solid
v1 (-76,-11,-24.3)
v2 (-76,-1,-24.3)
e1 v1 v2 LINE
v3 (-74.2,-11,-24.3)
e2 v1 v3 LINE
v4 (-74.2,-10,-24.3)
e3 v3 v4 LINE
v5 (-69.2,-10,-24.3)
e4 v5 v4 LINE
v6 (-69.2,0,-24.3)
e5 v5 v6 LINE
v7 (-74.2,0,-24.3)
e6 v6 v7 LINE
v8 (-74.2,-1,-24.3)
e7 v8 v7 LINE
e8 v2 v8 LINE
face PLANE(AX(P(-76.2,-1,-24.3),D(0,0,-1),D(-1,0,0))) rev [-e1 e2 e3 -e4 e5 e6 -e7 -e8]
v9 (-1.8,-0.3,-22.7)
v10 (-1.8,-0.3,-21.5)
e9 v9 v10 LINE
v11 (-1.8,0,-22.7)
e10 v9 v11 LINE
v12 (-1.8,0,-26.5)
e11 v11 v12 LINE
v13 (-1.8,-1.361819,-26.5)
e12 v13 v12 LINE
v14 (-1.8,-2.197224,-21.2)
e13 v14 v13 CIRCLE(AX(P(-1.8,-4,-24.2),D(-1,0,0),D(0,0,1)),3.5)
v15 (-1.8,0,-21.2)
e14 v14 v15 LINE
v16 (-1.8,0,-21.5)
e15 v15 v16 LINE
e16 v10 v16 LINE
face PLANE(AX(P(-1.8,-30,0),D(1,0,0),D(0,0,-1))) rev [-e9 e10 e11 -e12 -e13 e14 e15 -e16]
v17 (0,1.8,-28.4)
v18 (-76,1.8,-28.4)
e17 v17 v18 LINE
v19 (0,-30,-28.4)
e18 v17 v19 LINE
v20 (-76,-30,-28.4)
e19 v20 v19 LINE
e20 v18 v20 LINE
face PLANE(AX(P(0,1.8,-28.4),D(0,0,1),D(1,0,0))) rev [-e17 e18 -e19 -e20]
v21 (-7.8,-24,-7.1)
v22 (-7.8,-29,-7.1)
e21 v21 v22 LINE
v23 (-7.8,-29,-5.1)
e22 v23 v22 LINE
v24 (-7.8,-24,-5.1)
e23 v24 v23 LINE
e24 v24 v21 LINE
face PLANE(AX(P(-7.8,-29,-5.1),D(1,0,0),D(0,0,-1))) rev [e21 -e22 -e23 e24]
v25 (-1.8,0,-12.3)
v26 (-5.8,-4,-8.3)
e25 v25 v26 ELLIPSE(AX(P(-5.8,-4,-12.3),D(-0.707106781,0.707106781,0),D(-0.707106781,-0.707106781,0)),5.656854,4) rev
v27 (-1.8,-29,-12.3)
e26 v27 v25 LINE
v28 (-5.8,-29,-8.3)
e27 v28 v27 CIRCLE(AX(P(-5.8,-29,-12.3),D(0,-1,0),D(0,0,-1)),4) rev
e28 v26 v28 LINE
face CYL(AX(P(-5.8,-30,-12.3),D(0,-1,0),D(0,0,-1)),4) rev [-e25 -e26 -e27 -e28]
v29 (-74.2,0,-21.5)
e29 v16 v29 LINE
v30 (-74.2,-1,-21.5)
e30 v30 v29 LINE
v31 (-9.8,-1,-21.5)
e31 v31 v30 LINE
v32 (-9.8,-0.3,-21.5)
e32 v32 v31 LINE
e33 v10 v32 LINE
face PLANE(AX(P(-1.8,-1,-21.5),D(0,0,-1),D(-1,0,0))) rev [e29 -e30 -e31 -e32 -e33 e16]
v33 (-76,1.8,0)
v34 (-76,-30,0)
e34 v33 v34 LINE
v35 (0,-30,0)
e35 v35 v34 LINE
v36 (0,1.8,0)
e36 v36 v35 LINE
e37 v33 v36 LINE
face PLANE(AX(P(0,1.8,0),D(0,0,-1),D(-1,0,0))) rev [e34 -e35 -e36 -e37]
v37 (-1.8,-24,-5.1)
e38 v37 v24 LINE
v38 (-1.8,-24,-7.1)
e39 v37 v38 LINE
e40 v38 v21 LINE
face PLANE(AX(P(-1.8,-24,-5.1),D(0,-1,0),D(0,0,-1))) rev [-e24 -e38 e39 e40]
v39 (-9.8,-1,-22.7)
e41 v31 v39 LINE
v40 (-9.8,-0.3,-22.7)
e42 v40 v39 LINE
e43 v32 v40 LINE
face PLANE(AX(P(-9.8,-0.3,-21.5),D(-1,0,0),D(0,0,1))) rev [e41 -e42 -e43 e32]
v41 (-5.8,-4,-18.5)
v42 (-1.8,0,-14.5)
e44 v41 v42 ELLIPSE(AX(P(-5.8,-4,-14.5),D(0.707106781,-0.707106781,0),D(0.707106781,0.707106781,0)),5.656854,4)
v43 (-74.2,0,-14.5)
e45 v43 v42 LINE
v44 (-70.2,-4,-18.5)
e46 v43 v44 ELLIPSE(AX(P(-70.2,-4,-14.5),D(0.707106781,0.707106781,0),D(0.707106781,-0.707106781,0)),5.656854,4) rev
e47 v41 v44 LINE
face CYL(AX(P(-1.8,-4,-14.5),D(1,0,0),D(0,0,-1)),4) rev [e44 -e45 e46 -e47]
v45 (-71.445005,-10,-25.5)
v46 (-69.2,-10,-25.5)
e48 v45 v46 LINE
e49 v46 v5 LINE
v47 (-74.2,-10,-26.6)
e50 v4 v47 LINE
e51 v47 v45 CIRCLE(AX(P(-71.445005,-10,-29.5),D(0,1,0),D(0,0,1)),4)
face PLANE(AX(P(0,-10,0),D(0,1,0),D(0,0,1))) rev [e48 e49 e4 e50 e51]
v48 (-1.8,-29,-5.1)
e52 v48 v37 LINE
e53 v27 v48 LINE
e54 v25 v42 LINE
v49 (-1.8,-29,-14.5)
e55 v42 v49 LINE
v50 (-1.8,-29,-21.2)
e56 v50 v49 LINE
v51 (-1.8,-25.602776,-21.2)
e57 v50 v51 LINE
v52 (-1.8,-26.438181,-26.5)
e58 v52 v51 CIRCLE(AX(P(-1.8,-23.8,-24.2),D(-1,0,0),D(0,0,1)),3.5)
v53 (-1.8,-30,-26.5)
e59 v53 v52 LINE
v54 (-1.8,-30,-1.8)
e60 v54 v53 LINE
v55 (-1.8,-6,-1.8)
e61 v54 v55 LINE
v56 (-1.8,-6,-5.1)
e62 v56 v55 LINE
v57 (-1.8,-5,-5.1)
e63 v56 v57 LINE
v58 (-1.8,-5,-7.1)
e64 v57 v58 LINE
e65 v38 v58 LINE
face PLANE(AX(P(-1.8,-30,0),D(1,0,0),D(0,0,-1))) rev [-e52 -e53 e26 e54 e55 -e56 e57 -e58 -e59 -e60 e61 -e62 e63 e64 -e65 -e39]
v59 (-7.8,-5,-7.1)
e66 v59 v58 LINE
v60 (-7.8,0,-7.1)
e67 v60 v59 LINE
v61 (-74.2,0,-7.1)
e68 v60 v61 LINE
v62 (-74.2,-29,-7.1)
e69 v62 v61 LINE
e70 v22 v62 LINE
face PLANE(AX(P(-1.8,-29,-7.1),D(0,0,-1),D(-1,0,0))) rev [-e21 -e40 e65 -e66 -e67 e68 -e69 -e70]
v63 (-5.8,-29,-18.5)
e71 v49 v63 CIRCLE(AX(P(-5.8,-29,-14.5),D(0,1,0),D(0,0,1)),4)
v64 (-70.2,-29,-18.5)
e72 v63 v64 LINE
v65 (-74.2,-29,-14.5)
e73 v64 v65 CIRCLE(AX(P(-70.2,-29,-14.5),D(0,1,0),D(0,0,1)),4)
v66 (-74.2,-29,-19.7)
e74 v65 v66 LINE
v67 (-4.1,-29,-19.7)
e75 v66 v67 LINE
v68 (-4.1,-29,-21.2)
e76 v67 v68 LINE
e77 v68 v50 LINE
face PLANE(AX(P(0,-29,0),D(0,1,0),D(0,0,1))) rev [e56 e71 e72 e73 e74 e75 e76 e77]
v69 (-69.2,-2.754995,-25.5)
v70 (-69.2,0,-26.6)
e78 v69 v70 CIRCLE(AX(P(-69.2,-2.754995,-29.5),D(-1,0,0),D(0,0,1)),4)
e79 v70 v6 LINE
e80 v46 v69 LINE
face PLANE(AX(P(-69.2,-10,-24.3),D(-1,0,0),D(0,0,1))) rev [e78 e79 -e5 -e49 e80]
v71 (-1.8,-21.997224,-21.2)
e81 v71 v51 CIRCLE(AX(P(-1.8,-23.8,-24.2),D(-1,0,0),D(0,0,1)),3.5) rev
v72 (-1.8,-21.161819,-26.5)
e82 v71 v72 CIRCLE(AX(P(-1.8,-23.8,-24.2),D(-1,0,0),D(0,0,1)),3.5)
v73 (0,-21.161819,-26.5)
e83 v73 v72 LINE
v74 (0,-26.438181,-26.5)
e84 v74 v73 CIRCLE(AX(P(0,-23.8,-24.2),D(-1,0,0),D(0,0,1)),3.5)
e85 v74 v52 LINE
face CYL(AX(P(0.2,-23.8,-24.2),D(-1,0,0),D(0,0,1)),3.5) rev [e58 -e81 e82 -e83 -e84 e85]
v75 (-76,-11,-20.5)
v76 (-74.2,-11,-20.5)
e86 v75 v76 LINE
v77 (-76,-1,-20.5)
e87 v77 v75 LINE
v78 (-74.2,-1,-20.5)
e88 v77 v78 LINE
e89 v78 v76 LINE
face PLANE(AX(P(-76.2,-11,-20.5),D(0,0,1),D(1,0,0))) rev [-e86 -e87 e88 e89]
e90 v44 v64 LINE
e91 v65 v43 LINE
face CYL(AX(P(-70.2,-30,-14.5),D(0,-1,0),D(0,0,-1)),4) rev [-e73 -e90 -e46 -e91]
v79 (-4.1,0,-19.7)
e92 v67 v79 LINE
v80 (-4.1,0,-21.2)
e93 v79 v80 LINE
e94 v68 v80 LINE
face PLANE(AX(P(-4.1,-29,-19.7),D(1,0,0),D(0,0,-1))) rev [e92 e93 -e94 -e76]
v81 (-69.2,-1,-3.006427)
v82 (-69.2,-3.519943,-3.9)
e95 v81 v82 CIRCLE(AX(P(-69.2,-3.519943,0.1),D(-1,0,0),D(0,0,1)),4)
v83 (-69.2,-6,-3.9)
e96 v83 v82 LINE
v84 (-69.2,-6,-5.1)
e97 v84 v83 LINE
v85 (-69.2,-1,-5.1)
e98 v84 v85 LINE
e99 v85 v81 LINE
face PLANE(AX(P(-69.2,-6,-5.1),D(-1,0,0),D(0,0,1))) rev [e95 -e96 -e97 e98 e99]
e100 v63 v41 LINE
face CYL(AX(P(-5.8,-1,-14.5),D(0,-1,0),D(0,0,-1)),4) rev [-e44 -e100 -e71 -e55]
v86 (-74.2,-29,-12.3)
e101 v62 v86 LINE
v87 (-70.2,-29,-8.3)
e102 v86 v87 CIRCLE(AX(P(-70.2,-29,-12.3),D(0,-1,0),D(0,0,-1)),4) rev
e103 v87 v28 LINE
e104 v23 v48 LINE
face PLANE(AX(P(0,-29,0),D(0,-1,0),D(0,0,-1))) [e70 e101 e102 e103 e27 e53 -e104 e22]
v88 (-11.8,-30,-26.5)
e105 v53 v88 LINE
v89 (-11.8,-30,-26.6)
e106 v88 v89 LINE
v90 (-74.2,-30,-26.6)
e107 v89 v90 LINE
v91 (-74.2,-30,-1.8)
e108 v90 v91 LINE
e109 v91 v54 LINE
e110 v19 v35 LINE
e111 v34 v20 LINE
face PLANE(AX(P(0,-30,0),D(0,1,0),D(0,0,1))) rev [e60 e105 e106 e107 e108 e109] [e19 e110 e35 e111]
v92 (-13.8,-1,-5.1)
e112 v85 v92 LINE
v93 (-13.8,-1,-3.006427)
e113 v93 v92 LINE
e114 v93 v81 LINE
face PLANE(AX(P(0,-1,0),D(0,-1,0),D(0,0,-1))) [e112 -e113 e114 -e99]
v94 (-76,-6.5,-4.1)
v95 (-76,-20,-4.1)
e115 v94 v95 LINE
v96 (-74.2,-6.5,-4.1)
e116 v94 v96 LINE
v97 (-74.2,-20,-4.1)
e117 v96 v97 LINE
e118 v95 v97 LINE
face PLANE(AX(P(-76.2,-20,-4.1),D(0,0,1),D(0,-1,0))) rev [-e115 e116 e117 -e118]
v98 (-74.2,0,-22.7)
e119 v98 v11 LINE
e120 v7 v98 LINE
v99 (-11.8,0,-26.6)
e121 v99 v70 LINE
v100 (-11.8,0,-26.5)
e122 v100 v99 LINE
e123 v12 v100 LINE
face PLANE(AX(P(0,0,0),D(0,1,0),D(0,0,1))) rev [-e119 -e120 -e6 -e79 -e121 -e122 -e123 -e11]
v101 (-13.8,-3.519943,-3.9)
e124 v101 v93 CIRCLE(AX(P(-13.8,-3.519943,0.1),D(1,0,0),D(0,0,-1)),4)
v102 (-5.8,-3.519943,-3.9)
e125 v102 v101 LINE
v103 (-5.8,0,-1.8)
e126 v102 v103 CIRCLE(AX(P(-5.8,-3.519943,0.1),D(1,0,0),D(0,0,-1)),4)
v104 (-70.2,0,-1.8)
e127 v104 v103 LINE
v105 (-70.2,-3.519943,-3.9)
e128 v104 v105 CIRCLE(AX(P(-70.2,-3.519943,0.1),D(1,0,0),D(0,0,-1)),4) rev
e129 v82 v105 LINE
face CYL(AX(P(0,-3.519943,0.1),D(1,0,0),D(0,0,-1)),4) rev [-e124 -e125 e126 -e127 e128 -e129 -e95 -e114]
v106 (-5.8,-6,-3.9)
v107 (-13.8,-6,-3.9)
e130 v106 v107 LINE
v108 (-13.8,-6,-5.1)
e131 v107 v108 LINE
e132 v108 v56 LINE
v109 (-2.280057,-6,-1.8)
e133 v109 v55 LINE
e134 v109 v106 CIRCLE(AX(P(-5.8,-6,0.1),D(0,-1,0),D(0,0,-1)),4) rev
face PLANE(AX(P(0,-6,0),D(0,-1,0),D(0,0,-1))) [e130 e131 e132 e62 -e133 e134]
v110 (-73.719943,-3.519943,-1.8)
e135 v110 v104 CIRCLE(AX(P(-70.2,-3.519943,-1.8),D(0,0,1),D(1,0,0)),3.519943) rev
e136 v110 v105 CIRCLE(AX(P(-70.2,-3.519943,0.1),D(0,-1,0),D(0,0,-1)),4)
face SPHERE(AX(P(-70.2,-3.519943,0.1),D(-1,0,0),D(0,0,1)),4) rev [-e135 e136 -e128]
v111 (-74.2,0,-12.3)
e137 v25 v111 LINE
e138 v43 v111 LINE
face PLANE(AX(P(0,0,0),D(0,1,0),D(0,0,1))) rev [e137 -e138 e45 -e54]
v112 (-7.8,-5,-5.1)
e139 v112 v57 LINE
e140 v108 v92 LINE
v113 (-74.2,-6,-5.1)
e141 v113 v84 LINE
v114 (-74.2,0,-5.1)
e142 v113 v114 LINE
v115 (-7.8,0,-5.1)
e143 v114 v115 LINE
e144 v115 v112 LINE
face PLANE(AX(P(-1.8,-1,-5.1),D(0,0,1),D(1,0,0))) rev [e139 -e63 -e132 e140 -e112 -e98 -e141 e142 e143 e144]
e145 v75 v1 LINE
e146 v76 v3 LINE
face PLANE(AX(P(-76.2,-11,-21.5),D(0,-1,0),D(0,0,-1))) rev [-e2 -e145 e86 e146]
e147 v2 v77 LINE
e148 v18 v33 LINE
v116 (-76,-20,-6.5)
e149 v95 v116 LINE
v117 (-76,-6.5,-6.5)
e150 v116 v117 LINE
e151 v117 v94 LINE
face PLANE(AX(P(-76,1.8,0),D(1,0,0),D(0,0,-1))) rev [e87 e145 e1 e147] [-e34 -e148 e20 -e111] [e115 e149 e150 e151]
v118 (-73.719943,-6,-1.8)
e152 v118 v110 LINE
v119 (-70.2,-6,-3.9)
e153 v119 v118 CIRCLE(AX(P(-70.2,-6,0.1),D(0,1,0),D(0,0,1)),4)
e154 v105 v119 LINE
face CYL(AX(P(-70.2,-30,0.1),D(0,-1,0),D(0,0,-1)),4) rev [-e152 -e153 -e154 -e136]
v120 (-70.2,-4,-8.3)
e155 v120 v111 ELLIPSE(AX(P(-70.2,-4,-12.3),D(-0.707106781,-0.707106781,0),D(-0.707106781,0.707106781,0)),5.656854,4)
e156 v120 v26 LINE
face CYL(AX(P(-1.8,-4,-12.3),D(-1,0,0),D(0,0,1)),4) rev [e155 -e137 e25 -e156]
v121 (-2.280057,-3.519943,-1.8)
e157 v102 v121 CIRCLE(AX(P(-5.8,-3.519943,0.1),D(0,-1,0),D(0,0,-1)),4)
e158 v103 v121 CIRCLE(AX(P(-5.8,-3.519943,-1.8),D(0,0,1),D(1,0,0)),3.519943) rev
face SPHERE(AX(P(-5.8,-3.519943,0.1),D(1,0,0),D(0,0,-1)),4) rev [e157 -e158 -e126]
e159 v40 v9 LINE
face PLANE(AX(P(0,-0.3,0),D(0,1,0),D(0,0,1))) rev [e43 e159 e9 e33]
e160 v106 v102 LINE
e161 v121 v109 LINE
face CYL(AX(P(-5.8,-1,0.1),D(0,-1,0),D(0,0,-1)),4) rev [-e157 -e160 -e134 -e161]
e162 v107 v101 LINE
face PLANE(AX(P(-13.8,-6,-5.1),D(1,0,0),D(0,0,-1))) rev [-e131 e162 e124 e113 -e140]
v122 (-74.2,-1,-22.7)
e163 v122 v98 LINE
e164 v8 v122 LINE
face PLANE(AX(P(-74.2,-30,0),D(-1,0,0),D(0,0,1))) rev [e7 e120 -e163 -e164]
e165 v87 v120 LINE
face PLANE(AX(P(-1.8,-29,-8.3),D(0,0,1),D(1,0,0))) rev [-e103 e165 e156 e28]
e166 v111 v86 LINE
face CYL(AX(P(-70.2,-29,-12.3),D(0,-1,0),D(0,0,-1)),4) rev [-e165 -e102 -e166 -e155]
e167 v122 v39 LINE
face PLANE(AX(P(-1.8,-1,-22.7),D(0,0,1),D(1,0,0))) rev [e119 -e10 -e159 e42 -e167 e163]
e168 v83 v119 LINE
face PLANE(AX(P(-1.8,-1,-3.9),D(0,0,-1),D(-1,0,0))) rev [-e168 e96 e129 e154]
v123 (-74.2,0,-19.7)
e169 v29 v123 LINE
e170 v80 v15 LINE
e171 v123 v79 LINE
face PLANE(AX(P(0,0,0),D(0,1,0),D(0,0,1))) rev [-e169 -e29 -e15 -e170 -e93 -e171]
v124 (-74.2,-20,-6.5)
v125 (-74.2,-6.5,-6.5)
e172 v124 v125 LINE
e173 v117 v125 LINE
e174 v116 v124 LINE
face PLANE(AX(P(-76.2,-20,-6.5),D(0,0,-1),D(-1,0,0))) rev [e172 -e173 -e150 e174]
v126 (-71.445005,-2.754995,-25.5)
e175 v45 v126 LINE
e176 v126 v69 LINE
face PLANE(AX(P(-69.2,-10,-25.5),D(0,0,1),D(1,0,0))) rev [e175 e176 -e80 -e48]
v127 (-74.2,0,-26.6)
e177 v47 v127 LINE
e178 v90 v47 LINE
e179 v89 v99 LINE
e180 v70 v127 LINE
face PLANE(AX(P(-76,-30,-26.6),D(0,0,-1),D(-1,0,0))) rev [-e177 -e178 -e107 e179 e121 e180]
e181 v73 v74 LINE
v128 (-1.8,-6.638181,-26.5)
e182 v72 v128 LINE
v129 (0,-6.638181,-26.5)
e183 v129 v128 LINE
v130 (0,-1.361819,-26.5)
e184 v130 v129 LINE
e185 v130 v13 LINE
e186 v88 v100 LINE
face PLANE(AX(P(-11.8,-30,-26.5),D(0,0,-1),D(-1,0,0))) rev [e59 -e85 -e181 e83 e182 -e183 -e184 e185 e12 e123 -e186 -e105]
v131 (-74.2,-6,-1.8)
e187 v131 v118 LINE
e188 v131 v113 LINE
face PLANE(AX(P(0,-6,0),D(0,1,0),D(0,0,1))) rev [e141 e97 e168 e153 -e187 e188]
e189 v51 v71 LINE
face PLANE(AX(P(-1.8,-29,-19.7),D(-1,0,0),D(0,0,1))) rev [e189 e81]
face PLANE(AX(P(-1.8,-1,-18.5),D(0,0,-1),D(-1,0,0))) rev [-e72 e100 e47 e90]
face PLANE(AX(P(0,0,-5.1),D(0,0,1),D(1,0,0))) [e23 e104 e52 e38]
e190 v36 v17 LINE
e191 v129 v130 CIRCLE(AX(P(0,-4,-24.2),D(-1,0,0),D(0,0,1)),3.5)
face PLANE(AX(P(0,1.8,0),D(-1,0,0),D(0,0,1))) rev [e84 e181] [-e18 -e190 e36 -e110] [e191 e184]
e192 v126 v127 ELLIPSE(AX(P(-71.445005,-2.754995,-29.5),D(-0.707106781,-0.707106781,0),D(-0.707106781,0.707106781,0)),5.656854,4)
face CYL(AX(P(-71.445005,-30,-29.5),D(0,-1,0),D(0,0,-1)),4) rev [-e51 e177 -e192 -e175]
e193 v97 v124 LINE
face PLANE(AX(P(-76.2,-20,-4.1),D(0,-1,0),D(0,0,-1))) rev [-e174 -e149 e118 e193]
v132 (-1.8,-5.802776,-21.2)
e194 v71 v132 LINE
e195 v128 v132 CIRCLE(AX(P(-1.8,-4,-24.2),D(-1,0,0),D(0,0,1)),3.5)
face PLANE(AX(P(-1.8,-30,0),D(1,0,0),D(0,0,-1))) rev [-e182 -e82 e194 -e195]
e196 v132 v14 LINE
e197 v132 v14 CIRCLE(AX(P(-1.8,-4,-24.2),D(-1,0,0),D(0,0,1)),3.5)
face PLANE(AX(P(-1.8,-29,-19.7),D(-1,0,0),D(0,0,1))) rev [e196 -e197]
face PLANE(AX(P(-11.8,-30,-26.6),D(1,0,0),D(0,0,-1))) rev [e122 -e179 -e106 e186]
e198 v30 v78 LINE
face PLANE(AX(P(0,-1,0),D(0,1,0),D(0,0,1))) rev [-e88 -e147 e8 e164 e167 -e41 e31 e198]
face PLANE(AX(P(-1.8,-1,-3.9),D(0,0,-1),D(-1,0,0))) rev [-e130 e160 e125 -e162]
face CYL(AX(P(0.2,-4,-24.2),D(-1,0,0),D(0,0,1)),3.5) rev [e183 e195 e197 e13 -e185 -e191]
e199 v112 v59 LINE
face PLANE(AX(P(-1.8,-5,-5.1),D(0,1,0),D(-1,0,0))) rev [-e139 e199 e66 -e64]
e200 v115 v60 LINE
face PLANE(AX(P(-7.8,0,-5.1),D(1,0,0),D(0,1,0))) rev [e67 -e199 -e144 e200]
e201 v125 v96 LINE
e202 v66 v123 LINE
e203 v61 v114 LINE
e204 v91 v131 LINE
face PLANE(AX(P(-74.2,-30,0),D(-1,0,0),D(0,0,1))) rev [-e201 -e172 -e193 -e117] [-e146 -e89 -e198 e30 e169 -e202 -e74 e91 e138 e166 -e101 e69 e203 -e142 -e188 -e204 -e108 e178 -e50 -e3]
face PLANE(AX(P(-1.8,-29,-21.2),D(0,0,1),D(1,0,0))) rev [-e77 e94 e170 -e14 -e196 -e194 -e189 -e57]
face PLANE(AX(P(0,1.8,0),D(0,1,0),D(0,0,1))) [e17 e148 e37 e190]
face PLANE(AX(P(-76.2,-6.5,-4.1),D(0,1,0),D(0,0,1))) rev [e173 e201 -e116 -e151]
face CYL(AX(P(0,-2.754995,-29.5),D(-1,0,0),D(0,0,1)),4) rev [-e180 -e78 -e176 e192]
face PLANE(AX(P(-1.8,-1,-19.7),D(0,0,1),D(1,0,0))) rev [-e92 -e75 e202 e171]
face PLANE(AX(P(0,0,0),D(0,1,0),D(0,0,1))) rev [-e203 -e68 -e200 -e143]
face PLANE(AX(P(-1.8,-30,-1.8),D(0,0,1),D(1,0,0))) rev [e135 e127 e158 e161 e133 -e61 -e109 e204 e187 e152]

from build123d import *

# Parameters (mm, degrees)
SKETCH1_W            = 76
SKETCH1_H            = 28.4
BOSS_EXTRUDE1_DEPTH  = 1.8
SKETCH2_W            = 76
SKETCH2_H            = 1.8
BOSS_EXTRUDE2_DEPTH  = 30
SKETCH3_W            = 1.8
SKETCH3_H            = 26.6
BOSS_EXTRUDE3_DEPTH  = 30
SKETCH4_W            = 72.4
SKETCH4_H            = 1.2
BOSS_EXTRUDE4_DEPTH  = 1
SKETCH5_W            = 5
SKETCH5_H            = 1.2
BOSS_EXTRUDE5_DEPTH  = 28
SKETCH6_W            = 2.8
SKETCH6_H            = 10
CUT_EXTRUDE1_DEPTH   = 2
SKETCH7_W            = 5
SKETCH7_H            = 1.2
BOSS_EXTRUDE6_DEPTH  = 10
SKETCH8_W            = 8
SKETCH8_H            = 1.2
CUT_EXTRUDE2_DEPTH   = 0.7
SKETCH9_W            = 10
SKETCH9_H            = 0.1
BOSS_EXTRUDE7_DEPTH  = 30
CUT_EXTRUDE3_DEPTH   = 2
SKETCH11_W           = 62.4
SKETCH11_H           = 1.2
BOSS_EXTRUDE8_DEPTH  = 28
SKETCH12_W           = 72.4
SKETCH12_H           = 1.2
BOSS_EXTRUDE9_DEPTH  = 29
SKETCH13_W           = 72.4
SKETCH13_H           = 1.2
BOSS_EXTRUDE10_DEPTH = 1
SKETCH14_W           = 5
SKETCH14_H           = 1.2
SKETCH14_W_2         = 12
BOSS_EXTRUDE11_DEPTH = 5
SKETCH15_W           = 6
SKETCH15_H           = 5
BOSS_EXTRUDE12_DEPTH = 2
SKETCH16_W           = 2.4
SKETCH16_H           = 13.5
CUT_EXTRUDE4_DEPTH   = 2
SKETCH17_W           = 72.4
SKETCH17_H           = 1.8
BOSS_EXTRUDE13_DEPTH = 30
FILLET1_R            = 4
SKETCH19_W           = 2.3
SKETCH19_H           = 1.5
BOSS_EXTRUDE14_DEPTH = 29
FILLET2_R            = 4
FILLET3_R            = 4
FILLET4_R            = 4
SKETCH18_W           = 1
SKETCH18_H           = 10
CUT_EXTRUDE5_DEPTH   = 2


with BuildPart() as part:
    # Sketch1 → Boss-Extrude1 (new body)
    with BuildSketch(Plane(origin=(0, 0, 0), x_dir=(1, 0, 0), z_dir=(0, 1, 0))):
        with Locations((-38, 14.2)):
            Rectangle(SKETCH1_W, SKETCH1_H)
    extrude(amount=BOSS_EXTRUDE1_DEPTH)

    # Sketch2 → Boss-Extrude2 (add)
    with BuildSketch(Plane(origin=(0, 0, 0), x_dir=(-1, 0, 0), z_dir=(0, -1, 0))):
        with Locations((38, 27.5)):
            Rectangle(SKETCH2_W, SKETCH2_H)
    extrude(amount=BOSS_EXTRUDE2_DEPTH)

    # Sketch3 → Boss-Extrude3 (add)
    with BuildSketch(Plane(origin=(0, 0, 0), x_dir=(-1, 0, 0), z_dir=(0, -1, 0))):
        with Locations((75.1, 13.3)):
            Rectangle(SKETCH3_W, SKETCH3_H)
        with Locations((0.9, 13.3)):
            Rectangle(SKETCH3_W, SKETCH3_H)
    extrude(amount=BOSS_EXTRUDE3_DEPTH)

    # Sketch4 → Boss-Extrude4 (add)
    with BuildSketch(Plane(origin=(0, 0, 0), x_dir=(-1, 0, 0), z_dir=(0, -1, 0))):
        with Locations((38, 19.1)):
            Rectangle(SKETCH4_W, SKETCH4_H)
        with Locations((38, 22.1)):
            Rectangle(SKETCH4_W, SKETCH4_H)
    extrude(amount=BOSS_EXTRUDE4_DEPTH)

    # Sketch5 → Boss-Extrude5 (add)
    with BuildSketch(Plane(origin=(0, -1, 0), x_dir=(-1, 0, 0), z_dir=(0, -1, 0))):
        with Locations((4.3, 19.1)):
            Rectangle(SKETCH5_W, SKETCH5_H)
        with Locations((71.7, 19.1)):
            Rectangle(SKETCH5_W, SKETCH5_H)
    extrude(amount=BOSS_EXTRUDE5_DEPTH)

    # Sketch6 → Cut-Extrude1 (cut)
    with BuildSketch(Plane(origin=(-74.2, 0, 0), x_dir=(0, 0, -1), z_dir=(1, 0, 0))):
        with Locations((22.9, -6)):
            Rectangle(SKETCH6_W, SKETCH6_H)
    extrude(amount=-CUT_EXTRUDE1_DEPTH, mode=Mode.SUBTRACT)

    # Sketch7 → Boss-Extrude6 (add)
    with BuildSketch(Plane(origin=(0, 0, 0), x_dir=(-1, 0, 0), z_dir=(0, -1, 0))):
        with Locations((71.7, 24.9)):
            Rectangle(SKETCH7_W, SKETCH7_H)
    extrude(amount=BOSS_EXTRUDE6_DEPTH)

    # Sketch8 → Cut-Extrude2 (cut)
    with BuildSketch(Plane(origin=(0, -1, 0), x_dir=(-1, 0, 0), z_dir=(0, -1, 0))):
        with Locations((5.8, 22.1)):
            Rectangle(SKETCH8_W, SKETCH8_H)
    extrude(amount=-CUT_EXTRUDE2_DEPTH, mode=Mode.SUBTRACT)

    # Sketch9 → Boss-Extrude7 (add)
    with BuildSketch(Plane(origin=(0, 0, 0), x_dir=(-1, 0, 0), z_dir=(0, -1, 0))):
        with Locations((6.8, 26.55)):
            Rectangle(SKETCH9_W, SKETCH9_H)
    extrude(amount=BOSS_EXTRUDE7_DEPTH)

    # Sketch10 → Cut-Extrude3 (cut)
    with BuildSketch(Plane.ZY.offset(1.8)):
        with BuildLine():
            Line((-26.5, -6.638181192), (-26.5, -1.361818808))
            ThreePointArc((-26.5, -1.361818808), (-20.7, -4), (-26.5, -6.638181192))
        make_face()
        with BuildLine():
            Line((-26.5, -21.161818808), (-26.5, -26.438181192))
            ThreePointArc((-26.5, -26.438181192), (-20.7, -23.8), (-26.5, -21.161818808))
        make_face()
    extrude(amount=-CUT_EXTRUDE3_DEPTH, mode=Mode.SUBTRACT)

    # Sketch11 → Boss-Extrude8 (add)
    with BuildSketch(Plane(origin=(0, -1, 0), x_dir=(-1, 0, 0), z_dir=(0, -1, 0))):
        with Locations((38, 19.1)):
            Rectangle(SKETCH11_W, SKETCH11_H)
    extrude(amount=BOSS_EXTRUDE8_DEPTH)

    # Sketch12 → Boss-Extrude9 (add)
    with BuildSketch(Plane.XZ):
        with Locations((-38, -7.7)):
            Rectangle(SKETCH12_W, SKETCH12_H)
    extrude(amount=BOSS_EXTRUDE9_DEPTH)

    # Sketch13 → Boss-Extrude10 (add)
    with BuildSketch(Plane(origin=(0, 0, 0), x_dir=(-1, 0, 0), z_dir=(0, -1, 0))):
        with Locations((38, 4.5)):
            Rectangle(SKETCH13_W, SKETCH13_H)
    extrude(amount=BOSS_EXTRUDE10_DEPTH)

    # Sketch14 → Boss-Extrude11 (add)
    with BuildSketch(Plane(origin=(0, -1, 0), x_dir=(-1, 0, 0), z_dir=(0, -1, 0))):
        with Locations((71.7, 4.5)):
            Rectangle(SKETCH14_W, SKETCH14_H)
        with Locations((7.8, 4.5)):
            Rectangle(SKETCH14_W_2, SKETCH14_H)
    extrude(amount=BOSS_EXTRUDE11_DEPTH)

    # Sketch15 → Boss-Extrude12 (add)
    with BuildSketch(Plane.XY.offset(-7.1)):
        with Locations((-4.8, -26.5)):
            Rectangle(SKETCH15_W, SKETCH15_H)
        with Locations((-4.8, -2.5)):
            Rectangle(SKETCH15_W, SKETCH15_H)
    extrude(amount=BOSS_EXTRUDE12_DEPTH)

    # Sketch16 → Cut-Extrude4 (cut)
    with BuildSketch(Plane(origin=(-74.2, 0, 0), x_dir=(0, 0, -1), z_dir=(1, 0, 0))):
        with Locations((5.3, -13.25)):
            Rectangle(SKETCH16_W, SKETCH16_H)
    extrude(amount=-CUT_EXTRUDE4_DEPTH, mode=Mode.SUBTRACT)

    # Sketch17 → Boss-Extrude13 (add)
    with BuildSketch(Plane(origin=(0, 0, 0), x_dir=(-1, 0, 0), z_dir=(0, -1, 0))):
        with Locations((38, 0.9)):
            Rectangle(SKETCH17_W, SKETCH17_H)
    extrude(amount=BOSS_EXTRUDE13_DEPTH)

    # Fillet1
    # the kernel refuses this fillet: 4 mm, written as the material it adds along each edge
    with BuildSketch(Plane(origin=(-74.2, 0, -25.5), x_dir=(0, -1, 0), z_dir=(1, 0, 0))) as fillet1_piece_1:
        with BuildLine():
            CenterArc((2.754995463, 4), FILLET1_R, 226.468847833, 43.531152167)
            Line((0, 1.1), (-0.055099909, 1.042))
            ThreePointArc((-0.055099909, 1.042), (-0.08, 0.55), (-0.08, 0))
            Line((-0.08, 0), (0, -0.08))
            Line((0, -0.08), (2.754995463, -0.08))
            Line((2.754995463, -0.08), (2.754995463, 0))
        make_face()
    extrude(amount=5)
    with BuildSketch(Plane(origin=(-74.2, 0, -25.5), x_dir=(0, 0, -1), z_dir=(0, -1, 0))) as fillet1_piece_2:
        with BuildLine():
            CenterArc((4, 2.754995463), FILLET1_R, 180, 43.531152167)
            Line((0, 2.754995463), (-0.08, 2.754995463))
            Line((-0.08, 2.754995463), (-0.08, 0))
            Line((-0.08, 0), (0, -0.08))
            ThreePointArc((0, -0.08), (0.55, -0.08), (1.042, -0.055099909))
            Line((1.042, -0.055099909), (1.1, 0))
        make_face()
    extrude(amount=10)
    with BuildSketch(Plane(origin=(-1.8, 0, -8.3), x_dir=(0, 0, -1), z_dir=(0, -1, 0))) as fillet1_piece_3:
        with BuildLine():
            CenterArc((FILLET1_R, -FILLET1_R), FILLET1_R, 90, 90)
            Line((0, -FILLET1_R), (-FILLET1_R * 0.02, -FILLET1_R))
            Line((-FILLET1_R * 0.02, -FILLET1_R), (-FILLET1_R * 0.02, FILLET1_R * 0.02))
            Line((-FILLET1_R * 0.02, FILLET1_R * 0.02), (FILLET1_R, FILLET1_R * 0.02))
            Line((FILLET1_R, FILLET1_R * 0.02), (FILLET1_R, 0))
        make_face()
    extrude(amount=29)
    with BuildSketch(Plane(origin=(-1.8, 0, -8.3), x_dir=(0, 0, -1), z_dir=(-1, 0, 0)), Plane(origin=(-1.8, 0, -18.5), x_dir=(0, -1, 0), z_dir=(-1, 0, 0))) as fillet1_piece_4:
        with BuildLine():
            CenterArc((FILLET1_R, FILLET1_R), FILLET1_R, 180, 90)
            Line((0, FILLET1_R), (-FILLET1_R * 0.02, FILLET1_R))
            Line((-FILLET1_R * 0.02, FILLET1_R), (-FILLET1_R * 0.02, -FILLET1_R * 0.02))
            Line((-FILLET1_R * 0.02, -FILLET1_R * 0.02), (FILLET1_R, -FILLET1_R * 0.02))
            Line((FILLET1_R, -FILLET1_R * 0.02), (FILLET1_R, 0))
        make_face()
    extrude(amount=72.4)
    with BuildSketch(Plane(origin=(-74.2, 0, -8.3), x_dir=(0, 0, -1), z_dir=(0, -1, 0)), Plane(origin=(-1.8, 0, -18.5), x_dir=(0, 0, 1), z_dir=(0, -1, 0)), Plane(origin=(-74.2, -29, -18.5), x_dir=(0, 0, 1), z_dir=(0, 1, 0))) as fillet1_piece_5:
        with BuildLine():
            CenterArc((FILLET1_R, FILLET1_R), FILLET1_R, 180, 90)
            Line((0, FILLET1_R), (-FILLET1_R * 0.02, FILLET1_R))
            Line((-FILLET1_R * 0.02, FILLET1_R), (-FILLET1_R * 0.02, -FILLET1_R * 0.02))
            Line((-FILLET1_R * 0.02, -FILLET1_R * 0.02), (FILLET1_R, -FILLET1_R * 0.02))
            Line((FILLET1_R, -FILLET1_R * 0.02), (FILLET1_R, 0))
        make_face()
    extrude(amount=29)
    with BuildSketch(Plane(origin=(-74.2, 6.887488657, -25.5), x_dir=(0, 0, -1), z_dir=(0, -1, 0))) as fillet1_piece_6a_section:
        with BuildLine():
            CenterArc((4, 2.754995463), FILLET1_R, 180, 43.531152167)
            Line((0, 2.754995463), (-0.08, 2.754995463))
            Line((-0.08, 2.754995463), (-0.08, 0))
            Line((-0.08, 0), (0, -0.08))
            ThreePointArc((0, -0.08), (0.55, -0.08), (1.042, -0.055099909))
            Line((1.042, -0.055099909), (1.1, 0))
        make_face()
    fillet1_piece_6a = extrude(amount=16.887488657, mode=Mode.PRIVATE)
    fillet1_piece_6a = split(fillet1_piece_6a, bisect_by=Plane(origin=(-73.454361025, 0, -25.767986637), z_dir=(0, 1, 0)), keep=Keep.TOP, mode=Mode.PRIVATE)
    with BuildSketch(Plane(origin=(-81.087488657, 0, -25.5), x_dir=(0, -1, 0), z_dir=(1, 0, 0))) as fillet1_piece_6b_section:
        with BuildLine():
            CenterArc((2.754995463, 4), FILLET1_R, 226.468847833, 43.531152167)
            Line((0, 1.1), (-0.055099909, 1.042))
            ThreePointArc((-0.055099909, 1.042), (-0.08, 0.55), (-0.08, 0))
            Line((-0.08, 0), (0, -0.08))
            Line((0, -0.08), (2.754995463, -0.08))
            Line((2.754995463, -0.08), (2.754995463, 0))
        make_face()
    fillet1_piece_6b = extrude(amount=11.887488657, mode=Mode.PRIVATE)
    fillet1_piece_6b = split(fillet1_piece_6b, bisect_by=Plane(origin=(-74.2, -0.745638975, -25.767986637), z_dir=(-1, 0, 0)), keep=Keep.TOP, mode=Mode.PRIVATE)
    fillet1_piece_6 = fillet1_piece_6a & fillet1_piece_6b
    add(fillet1_piece_6)
    with BuildSketch(Plane(origin=(-1.8, 10, -8.3), x_dir=(0, 0, -1), z_dir=(0, -1, 0))) as fillet1_piece_7a_section:
        with BuildLine():
            CenterArc((FILLET1_R, -FILLET1_R), FILLET1_R, 90, 90)
            Line((0, -FILLET1_R), (-FILLET1_R * 0.02, -FILLET1_R))
            Line((-FILLET1_R * 0.02, -FILLET1_R), (-FILLET1_R * 0.02, FILLET1_R * 0.02))
            Line((-FILLET1_R * 0.02, FILLET1_R * 0.02), (FILLET1_R, FILLET1_R * 0.02))
            Line((FILLET1_R, FILLET1_R * 0.02), (FILLET1_R, 0))
        make_face()
    fillet1_piece_7a = extrude(amount=39, mode=Mode.PRIVATE)
    fillet1_piece_7a = split(fillet1_piece_7a, bisect_by=Plane(origin=(-2.705580457, 0, -9.205580457), z_dir=(0, 1, 0)), keep=Keep.TOP, mode=Mode.PRIVATE)
    with BuildSketch(Plane(origin=(8.2, 0, -8.3), x_dir=(0, 0, -1), z_dir=(-1, 0, 0))) as fillet1_piece_7b_section:
        with BuildLine():
            CenterArc((FILLET1_R, FILLET1_R), FILLET1_R, 180, 90)
            Line((0, FILLET1_R), (-FILLET1_R * 0.02, FILLET1_R))
            Line((-FILLET1_R * 0.02, FILLET1_R), (-FILLET1_R * 0.02, -FILLET1_R * 0.02))
            Line((-FILLET1_R * 0.02, -FILLET1_R * 0.02), (FILLET1_R, -FILLET1_R * 0.02))
            Line((FILLET1_R, -FILLET1_R * 0.02), (FILLET1_R, 0))
        make_face()
    fillet1_piece_7b = extrude(amount=82.4, mode=Mode.PRIVATE)
    fillet1_piece_7b = split(fillet1_piece_7b, bisect_by=Plane(origin=(-1.8, -0.905580457, -9.205580457), z_dir=(1, 0, 0)), keep=Keep.TOP, mode=Mode.PRIVATE)
    fillet1_piece_7 = fillet1_piece_7a & fillet1_piece_7b
    add(fillet1_piece_7)
    with BuildSketch(Plane(origin=(-74.2, 10, -8.3), x_dir=(0, 0, -1), z_dir=(0, -1, 0))) as fillet1_piece_8a_section:
        with BuildLine():
            CenterArc((FILLET1_R, FILLET1_R), FILLET1_R, 180, 90)
            Line((0, FILLET1_R), (-FILLET1_R * 0.02, FILLET1_R))
            Line((-FILLET1_R * 0.02, FILLET1_R), (-FILLET1_R * 0.02, -FILLET1_R * 0.02))
            Line((-FILLET1_R * 0.02, -FILLET1_R * 0.02), (FILLET1_R, -FILLET1_R * 0.02))
            Line((FILLET1_R, -FILLET1_R * 0.02), (FILLET1_R, 0))
        make_face()
    fillet1_piece_8a = extrude(amount=39, mode=Mode.PRIVATE)
    fillet1_piece_8a = split(fillet1_piece_8a, bisect_by=Plane(origin=(-73.294419543, 0, -9.205580457), z_dir=(0, 1, 0)), keep=Keep.TOP, mode=Mode.PRIVATE)
    with BuildSketch(Plane(origin=(-1.8, 0, -8.3), x_dir=(0, 0, -1), z_dir=(-1, 0, 0))) as fillet1_piece_8b_section:
        with BuildLine():
            CenterArc((FILLET1_R, FILLET1_R), FILLET1_R, 180, 90)
            Line((0, FILLET1_R), (-FILLET1_R * 0.02, FILLET1_R))
            Line((-FILLET1_R * 0.02, FILLET1_R), (-FILLET1_R * 0.02, -FILLET1_R * 0.02))
            Line((-FILLET1_R * 0.02, -FILLET1_R * 0.02), (FILLET1_R, -FILLET1_R * 0.02))
            Line((FILLET1_R, -FILLET1_R * 0.02), (FILLET1_R, 0))
        make_face()
    fillet1_piece_8b = extrude(amount=82.4, mode=Mode.PRIVATE)
    fillet1_piece_8b = split(fillet1_piece_8b, bisect_by=Plane(origin=(-74.2, -0.905580457, -9.205580457), z_dir=(-1, 0, 0)), keep=Keep.TOP, mode=Mode.PRIVATE)
    fillet1_piece_8 = fillet1_piece_8a & fillet1_piece_8b
    add(fillet1_piece_8)
    with BuildSketch(Plane(origin=(-1.8, 10, -18.5), x_dir=(0, 0, 1), z_dir=(0, -1, 0))) as fillet1_piece_9a_section:
        with BuildLine():
            CenterArc((FILLET1_R, FILLET1_R), FILLET1_R, 180, 90)
            Line((0, FILLET1_R), (-FILLET1_R * 0.02, FILLET1_R))
            Line((-FILLET1_R * 0.02, FILLET1_R), (-FILLET1_R * 0.02, -FILLET1_R * 0.02))
            Line((-FILLET1_R * 0.02, -FILLET1_R * 0.02), (FILLET1_R, -FILLET1_R * 0.02))
            Line((FILLET1_R, -FILLET1_R * 0.02), (FILLET1_R, 0))
        make_face()
    fillet1_piece_9a = extrude(amount=39, mode=Mode.PRIVATE)
    fillet1_piece_9a = split(fillet1_piece_9a, bisect_by=Plane(origin=(-2.705580457, 0, -17.594419543), z_dir=(0, 1, 0)), keep=Keep.TOP, mode=Mode.PRIVATE)
    with BuildSketch(Plane(origin=(8.2, 0, -18.5), x_dir=(0, -1, 0), z_dir=(-1, 0, 0))) as fillet1_piece_9b_section:
        with BuildLine():
            CenterArc((FILLET1_R, FILLET1_R), FILLET1_R, 180, 90)
            Line((0, FILLET1_R), (-FILLET1_R * 0.02, FILLET1_R))
            Line((-FILLET1_R * 0.02, FILLET1_R), (-FILLET1_R * 0.02, -FILLET1_R * 0.02))
            Line((-FILLET1_R * 0.02, -FILLET1_R * 0.02), (FILLET1_R, -FILLET1_R * 0.02))
            Line((FILLET1_R, -FILLET1_R * 0.02), (FILLET1_R, 0))
        make_face()
    fillet1_piece_9b = extrude(amount=82.4, mode=Mode.PRIVATE)
    fillet1_piece_9b = split(fillet1_piece_9b, bisect_by=Plane(origin=(-1.8, -0.905580457, -17.594419543), z_dir=(1, 0, 0)), keep=Keep.TOP, mode=Mode.PRIVATE)
    fillet1_piece_9 = fillet1_piece_9a & fillet1_piece_9b
    add(fillet1_piece_9)
    with BuildSketch(Plane(origin=(-74.2, -29, -18.5), x_dir=(0, 0, 1), z_dir=(0, 1, 0))) as fillet1_piece_10a_section:
        with BuildLine():
            CenterArc((FILLET1_R, FILLET1_R), FILLET1_R, 180, 90)
            Line((0, FILLET1_R), (-FILLET1_R * 0.02, FILLET1_R))
            Line((-FILLET1_R * 0.02, FILLET1_R), (-FILLET1_R * 0.02, -FILLET1_R * 0.02))
            Line((-FILLET1_R * 0.02, -FILLET1_R * 0.02), (FILLET1_R, -FILLET1_R * 0.02))
            Line((FILLET1_R, -FILLET1_R * 0.02), (FILLET1_R, 0))
        make_face()
    fillet1_piece_10a = extrude(amount=39, mode=Mode.PRIVATE)
    fillet1_piece_10a = split(fillet1_piece_10a, bisect_by=Plane(origin=(-73.294419543, 0, -17.594419543), z_dir=(0, 1, 0)), keep=Keep.TOP, mode=Mode.PRIVATE)
    with BuildSketch(Plane(origin=(-1.8, 0, -18.5), x_dir=(0, -1, 0), z_dir=(-1, 0, 0))) as fillet1_piece_10b_section:
        with BuildLine():
            CenterArc((FILLET1_R, FILLET1_R), FILLET1_R, 180, 90)
            Line((0, FILLET1_R), (-FILLET1_R * 0.02, FILLET1_R))
            Line((-FILLET1_R * 0.02, FILLET1_R), (-FILLET1_R * 0.02, -FILLET1_R * 0.02))
            Line((-FILLET1_R * 0.02, -FILLET1_R * 0.02), (FILLET1_R, -FILLET1_R * 0.02))
            Line((FILLET1_R, -FILLET1_R * 0.02), (FILLET1_R, 0))
        make_face()
    fillet1_piece_10b = extrude(amount=82.4, mode=Mode.PRIVATE)
    fillet1_piece_10b = split(fillet1_piece_10b, bisect_by=Plane(origin=(-74.2, -0.905580457, -17.594419543), z_dir=(-1, 0, 0)), keep=Keep.TOP, mode=Mode.PRIVATE)
    fillet1_piece_10 = fillet1_piece_10a & fillet1_piece_10b
    add(fillet1_piece_10)

    # Sketch19 → Boss-Extrude14 (add)
    with BuildSketch(Plane(origin=(0, 0, 0), x_dir=(-1, 0, 0), z_dir=(0, -1, 0))):
        with Locations((2.95, 20.45)):
            Rectangle(SKETCH19_W, SKETCH19_H)
    extrude(amount=BOSS_EXTRUDE14_DEPTH)

    # Fillet2
    # the kernel refuses this fillet: 4 mm, written as the material it adds along each edge
    with BuildSketch(Plane(origin=(-74.2, 0, -3.9), x_dir=(0, 0, 1), z_dir=(1, 0, 0))) as fillet2_piece_1_section:
        with BuildLine():
            CenterArc((4, 3.519943181), FILLET2_R, 180, 61.640649972)
            Line((0, 3.519943181), (-0.08, 3.519943181))
            Line((-0.08, 3.519943181), (-0.08, 0))
            Line((-0.08, 0), (0, -0.08))
            ThreePointArc((0, -0.08), (1.05, -0.08), (2.062, -0.070398864))
            Line((2.062, -0.070398864), (2.1, 0))
        make_face()
    fillet2_piece_1 = extrude(amount=72.4, mode=Mode.PRIVATE)
    fillet2_piece_1 = split(fillet2_piece_1, bisect_by=Plane(origin=(-69.2, -0.386743346, -3.163583033), z_dir=(-1, 0, 0)), keep=Keep.TOP, mode=Mode.PRIVATE)
    fillet2_piece_1 = split(fillet2_piece_1, bisect_by=Plane(origin=(-71.7, -1, -3.163583033), z_dir=(0, 1, 0)), keep=Keep.TOP, mode=Mode.PRIVATE)
    add(fillet2_piece_1)
    with BuildSketch(Plane(origin=(-74.2, 0, -3.9), x_dir=(0, 0, 1), z_dir=(1, 0, 0))) as fillet2_piece_2_section:
        with BuildLine():
            CenterArc((4, 3.519943181), FILLET2_R, 180, 61.640649972)
            Line((0, 3.519943181), (-0.08, 3.519943181))
            Line((-0.08, 3.519943181), (-0.08, 0))
            Line((-0.08, 0), (0, -0.08))
            ThreePointArc((0, -0.08), (1.05, -0.08), (2.062, -0.070398864))
            Line((2.062, -0.070398864), (2.1, 0))
        make_face()
    fillet2_piece_2 = extrude(amount=72.4, mode=Mode.PRIVATE)
    fillet2_piece_2 = split(fillet2_piece_2, bisect_by=Plane(origin=(-69.2, -1.757123938, -3.704514418), z_dir=(-1, 0, 0)), keep=Keep.TOP, mode=Mode.PRIVATE)
    fillet2_piece_2 = split(fillet2_piece_2, bisect_by=Plane(origin=(-71.7, -1, -3.704514418), z_dir=(0, -1, 0)), keep=Keep.TOP, mode=Mode.PRIVATE)
    add(fillet2_piece_2)
    with BuildSketch(Plane(origin=(-74.2, 0, -3.9), x_dir=(0, 0, 1), z_dir=(1, 0, 0))) as fillet2_piece_3_section:
        with BuildLine():
            CenterArc((4, 3.519943181), FILLET2_R, 180, 61.640649972)
            Line((0, 3.519943181), (-0.08, 3.519943181))
            Line((-0.08, 3.519943181), (-0.08, 0))
            Line((-0.08, 0), (0, -0.08))
            ThreePointArc((0, -0.08), (1.05, -0.08), (2.062, -0.070398864))
            Line((2.062, -0.070398864), (2.1, 0))
        make_face()
    fillet2_piece_3 = extrude(amount=72.4, mode=Mode.PRIVATE)
    fillet2_piece_3 = split(fillet2_piece_3, bisect_by=Plane(origin=(-69.2, -0.386743346, -3.163583033), z_dir=(1, 0, 0)), keep=Keep.TOP, mode=Mode.PRIVATE)
    fillet2_piece_3 = split(fillet2_piece_3, bisect_by=Plane(origin=(-41.5, -1, -3.163583033), z_dir=(0, 1, 0)), keep=Keep.TOP, mode=Mode.PRIVATE)
    fillet2_piece_3 = split(fillet2_piece_3, bisect_by=Plane(origin=(-13.8, -0.386743346, -3.163583033), z_dir=(-1, 0, 0)), keep=Keep.TOP, mode=Mode.PRIVATE)
    add(fillet2_piece_3)
    with BuildSketch(Plane(origin=(-74.2, 0, -3.9), x_dir=(0, 0, 1), z_dir=(1, 0, 0))) as fillet2_piece_4_section:
        with BuildLine():
            CenterArc((4, 3.519943181), FILLET2_R, 180, 61.640649972)
            Line((0, 3.519943181), (-0.08, 3.519943181))
            Line((-0.08, 3.519943181), (-0.08, 0))
            Line((-0.08, 0), (0, -0.08))
            ThreePointArc((0, -0.08), (1.05, -0.08), (2.062, -0.070398864))
            Line((2.062, -0.070398864), (2.1, 0))
        make_face()
    fillet2_piece_4 = extrude(amount=72.4, mode=Mode.PRIVATE)
    fillet2_piece_4 = split(fillet2_piece_4, bisect_by=Plane(origin=(-7.8, -1, -3.163583033), z_dir=(0, 1, 0)), keep=Keep.TOP, mode=Mode.PRIVATE)
    fillet2_piece_4 = split(fillet2_piece_4, bisect_by=Plane(origin=(-13.8, -0.386743346, -3.163583033), z_dir=(1, 0, 0)), keep=Keep.TOP, mode=Mode.PRIVATE)
    add(fillet2_piece_4)
    with BuildSketch(Plane(origin=(-74.2, 0, -3.9), x_dir=(0, 0, 1), z_dir=(1, 0, 0))) as fillet2_piece_5_section:
        with BuildLine():
            CenterArc((4, 3.519943181), FILLET2_R, 180, 61.640649972)
            Line((0, 3.519943181), (-0.08, 3.519943181))
            Line((-0.08, 3.519943181), (-0.08, 0))
            Line((-0.08, 0), (0, -0.08))
            ThreePointArc((0, -0.08), (1.05, -0.08), (2.062, -0.070398864))
            Line((2.062, -0.070398864), (2.1, 0))
        make_face()
    fillet2_piece_5 = extrude(amount=72.4, mode=Mode.PRIVATE)
    fillet2_piece_5 = split(fillet2_piece_5, bisect_by=Plane(origin=(-7.8, -1, -3.704514418), z_dir=(0, -1, 0)), keep=Keep.TOP, mode=Mode.PRIVATE)
    fillet2_piece_5 = split(fillet2_piece_5, bisect_by=Plane(origin=(-13.8, -1.757123938, -3.704514418), z_dir=(1, 0, 0)), keep=Keep.TOP, mode=Mode.PRIVATE)
    add(fillet2_piece_5)

    # Fillet3
    # the kernel refuses this fillet: 4 mm, written as the material it adds along each edge
    with BuildSketch(Plane(origin=(-74.2, -6, -3.9), x_dir=(1, 0, 0), z_dir=(0, 1, 0))) as fillet3_piece_1_section:
        with BuildLine():
            CenterArc((FILLET3_R, -FILLET3_R), FILLET3_R, 90, 90)
            Line((0, -FILLET3_R), (0, 0))
            Line((0, 0), (FILLET3_R, 0))
        make_face()
    fillet3_piece_1 = extrude(amount=2.480056819, mode=Mode.PRIVATE)
    fillet3_piece_1 = split(fillet3_piece_1, bisect_by=Plane(origin=(-72.77704302, -5.337014611, -1.8), z_dir=(0, 0, -1)), keep=Keep.TOP, mode=Mode.PRIVATE)
    add(fillet3_piece_1)
    with BuildSketch(Plane(origin=(-74.2, -3.519943181, 0.1), x_dir=(0, -0.42114798724942737, 0.9069919364778037), z_dir=(0, -0.9069919364778037, -0.42114798724942737))) as fillet3_piece_2_section:
        with BuildLine():
            CenterArc((4 - FILLET3_R, -FILLET3_R), FILLET3_R, 0, 90)
            Line((4 - FILLET3_R, 0), (4, 0))
            Line((4, 0), (4, -FILLET3_R))
        make_face()
    fillet3_piece_2 = revolve(axis=Axis((-74.2, -3.519943181, 0.1), (-1, 0, 0)), revolution_arc=204.907085957, mode=Mode.PRIVATE)
    fillet3_piece_2 = split(fillet3_piece_2, bisect_by=Plane(origin=(-73.105752366, -1.96496167, -1.8), z_dir=(0, 0, -1)), keep=Keep.TOP, mode=Mode.PRIVATE)
    add(fillet3_piece_2)

    # Fillet4
    # the kernel refuses this fillet: 4 mm, written as the material it adds along each edge
    with BuildSketch(Plane(origin=(-1.8, -3.519943181, -3.9), x_dir=(0, 0, 1), z_dir=(0, -1, 0))) as fillet4_piece_1_section:
        with BuildLine():
            CenterArc((FILLET4_R, FILLET4_R), FILLET4_R, 180, 90)
            Line((0, FILLET4_R), (0, 0))
            Line((0, 0), (FILLET4_R, 0))
        make_face()
    fillet4_piece_1 = extrude(amount=2.480056819, mode=Mode.PRIVATE)
    fillet4_piece_1 = split(fillet4_piece_1, bisect_by=Plane(origin=(-2.621035263, -4.579536444, 0), z_dir=(0, 0, -1)), keep=Keep.TOP, mode=Mode.PRIVATE)
    add(fillet4_piece_1)
    with BuildSketch(Plane(origin=(-1.8, -3.519943181, 0.1), x_dir=(0, 0, -1), z_dir=(0, -1, 0))) as fillet4_piece_2_section:
        with BuildLine():
            CenterArc((4 - FILLET4_R, -FILLET4_R), FILLET4_R, 0, 90)
            Line((4 - FILLET4_R, 0), (4, 0))
            Line((4, 0), (4, -FILLET4_R))
        make_face()
    fillet4_piece_2 = revolve(axis=Axis((-1.8, -3.519943181, 0.1), (1, 0, 0)), revolution_arc=204.907085957, mode=Mode.PRIVATE)
    fillet4_piece_2 = split(fillet4_piece_2, bisect_by=Plane(origin=(-2.894247633, -1.96496167, 0), z_dir=(0, 0, -1)), keep=Keep.TOP, mode=Mode.PRIVATE)
    add(fillet4_piece_2)

    # Sketch18 → Cut-Extrude5 (cut)
    with BuildSketch(Plane(origin=(-74.2, 0, 0), x_dir=(0, 0, -1), z_dir=(1, 0, 0))):
        with Locations((21, -6)):
            Rectangle(SKETCH18_W, SKETCH18_H)
    extrude(amount=-CUT_EXTRUDE5_DEPTH, mode=Mode.SUBTRACT)


solid = part.part
